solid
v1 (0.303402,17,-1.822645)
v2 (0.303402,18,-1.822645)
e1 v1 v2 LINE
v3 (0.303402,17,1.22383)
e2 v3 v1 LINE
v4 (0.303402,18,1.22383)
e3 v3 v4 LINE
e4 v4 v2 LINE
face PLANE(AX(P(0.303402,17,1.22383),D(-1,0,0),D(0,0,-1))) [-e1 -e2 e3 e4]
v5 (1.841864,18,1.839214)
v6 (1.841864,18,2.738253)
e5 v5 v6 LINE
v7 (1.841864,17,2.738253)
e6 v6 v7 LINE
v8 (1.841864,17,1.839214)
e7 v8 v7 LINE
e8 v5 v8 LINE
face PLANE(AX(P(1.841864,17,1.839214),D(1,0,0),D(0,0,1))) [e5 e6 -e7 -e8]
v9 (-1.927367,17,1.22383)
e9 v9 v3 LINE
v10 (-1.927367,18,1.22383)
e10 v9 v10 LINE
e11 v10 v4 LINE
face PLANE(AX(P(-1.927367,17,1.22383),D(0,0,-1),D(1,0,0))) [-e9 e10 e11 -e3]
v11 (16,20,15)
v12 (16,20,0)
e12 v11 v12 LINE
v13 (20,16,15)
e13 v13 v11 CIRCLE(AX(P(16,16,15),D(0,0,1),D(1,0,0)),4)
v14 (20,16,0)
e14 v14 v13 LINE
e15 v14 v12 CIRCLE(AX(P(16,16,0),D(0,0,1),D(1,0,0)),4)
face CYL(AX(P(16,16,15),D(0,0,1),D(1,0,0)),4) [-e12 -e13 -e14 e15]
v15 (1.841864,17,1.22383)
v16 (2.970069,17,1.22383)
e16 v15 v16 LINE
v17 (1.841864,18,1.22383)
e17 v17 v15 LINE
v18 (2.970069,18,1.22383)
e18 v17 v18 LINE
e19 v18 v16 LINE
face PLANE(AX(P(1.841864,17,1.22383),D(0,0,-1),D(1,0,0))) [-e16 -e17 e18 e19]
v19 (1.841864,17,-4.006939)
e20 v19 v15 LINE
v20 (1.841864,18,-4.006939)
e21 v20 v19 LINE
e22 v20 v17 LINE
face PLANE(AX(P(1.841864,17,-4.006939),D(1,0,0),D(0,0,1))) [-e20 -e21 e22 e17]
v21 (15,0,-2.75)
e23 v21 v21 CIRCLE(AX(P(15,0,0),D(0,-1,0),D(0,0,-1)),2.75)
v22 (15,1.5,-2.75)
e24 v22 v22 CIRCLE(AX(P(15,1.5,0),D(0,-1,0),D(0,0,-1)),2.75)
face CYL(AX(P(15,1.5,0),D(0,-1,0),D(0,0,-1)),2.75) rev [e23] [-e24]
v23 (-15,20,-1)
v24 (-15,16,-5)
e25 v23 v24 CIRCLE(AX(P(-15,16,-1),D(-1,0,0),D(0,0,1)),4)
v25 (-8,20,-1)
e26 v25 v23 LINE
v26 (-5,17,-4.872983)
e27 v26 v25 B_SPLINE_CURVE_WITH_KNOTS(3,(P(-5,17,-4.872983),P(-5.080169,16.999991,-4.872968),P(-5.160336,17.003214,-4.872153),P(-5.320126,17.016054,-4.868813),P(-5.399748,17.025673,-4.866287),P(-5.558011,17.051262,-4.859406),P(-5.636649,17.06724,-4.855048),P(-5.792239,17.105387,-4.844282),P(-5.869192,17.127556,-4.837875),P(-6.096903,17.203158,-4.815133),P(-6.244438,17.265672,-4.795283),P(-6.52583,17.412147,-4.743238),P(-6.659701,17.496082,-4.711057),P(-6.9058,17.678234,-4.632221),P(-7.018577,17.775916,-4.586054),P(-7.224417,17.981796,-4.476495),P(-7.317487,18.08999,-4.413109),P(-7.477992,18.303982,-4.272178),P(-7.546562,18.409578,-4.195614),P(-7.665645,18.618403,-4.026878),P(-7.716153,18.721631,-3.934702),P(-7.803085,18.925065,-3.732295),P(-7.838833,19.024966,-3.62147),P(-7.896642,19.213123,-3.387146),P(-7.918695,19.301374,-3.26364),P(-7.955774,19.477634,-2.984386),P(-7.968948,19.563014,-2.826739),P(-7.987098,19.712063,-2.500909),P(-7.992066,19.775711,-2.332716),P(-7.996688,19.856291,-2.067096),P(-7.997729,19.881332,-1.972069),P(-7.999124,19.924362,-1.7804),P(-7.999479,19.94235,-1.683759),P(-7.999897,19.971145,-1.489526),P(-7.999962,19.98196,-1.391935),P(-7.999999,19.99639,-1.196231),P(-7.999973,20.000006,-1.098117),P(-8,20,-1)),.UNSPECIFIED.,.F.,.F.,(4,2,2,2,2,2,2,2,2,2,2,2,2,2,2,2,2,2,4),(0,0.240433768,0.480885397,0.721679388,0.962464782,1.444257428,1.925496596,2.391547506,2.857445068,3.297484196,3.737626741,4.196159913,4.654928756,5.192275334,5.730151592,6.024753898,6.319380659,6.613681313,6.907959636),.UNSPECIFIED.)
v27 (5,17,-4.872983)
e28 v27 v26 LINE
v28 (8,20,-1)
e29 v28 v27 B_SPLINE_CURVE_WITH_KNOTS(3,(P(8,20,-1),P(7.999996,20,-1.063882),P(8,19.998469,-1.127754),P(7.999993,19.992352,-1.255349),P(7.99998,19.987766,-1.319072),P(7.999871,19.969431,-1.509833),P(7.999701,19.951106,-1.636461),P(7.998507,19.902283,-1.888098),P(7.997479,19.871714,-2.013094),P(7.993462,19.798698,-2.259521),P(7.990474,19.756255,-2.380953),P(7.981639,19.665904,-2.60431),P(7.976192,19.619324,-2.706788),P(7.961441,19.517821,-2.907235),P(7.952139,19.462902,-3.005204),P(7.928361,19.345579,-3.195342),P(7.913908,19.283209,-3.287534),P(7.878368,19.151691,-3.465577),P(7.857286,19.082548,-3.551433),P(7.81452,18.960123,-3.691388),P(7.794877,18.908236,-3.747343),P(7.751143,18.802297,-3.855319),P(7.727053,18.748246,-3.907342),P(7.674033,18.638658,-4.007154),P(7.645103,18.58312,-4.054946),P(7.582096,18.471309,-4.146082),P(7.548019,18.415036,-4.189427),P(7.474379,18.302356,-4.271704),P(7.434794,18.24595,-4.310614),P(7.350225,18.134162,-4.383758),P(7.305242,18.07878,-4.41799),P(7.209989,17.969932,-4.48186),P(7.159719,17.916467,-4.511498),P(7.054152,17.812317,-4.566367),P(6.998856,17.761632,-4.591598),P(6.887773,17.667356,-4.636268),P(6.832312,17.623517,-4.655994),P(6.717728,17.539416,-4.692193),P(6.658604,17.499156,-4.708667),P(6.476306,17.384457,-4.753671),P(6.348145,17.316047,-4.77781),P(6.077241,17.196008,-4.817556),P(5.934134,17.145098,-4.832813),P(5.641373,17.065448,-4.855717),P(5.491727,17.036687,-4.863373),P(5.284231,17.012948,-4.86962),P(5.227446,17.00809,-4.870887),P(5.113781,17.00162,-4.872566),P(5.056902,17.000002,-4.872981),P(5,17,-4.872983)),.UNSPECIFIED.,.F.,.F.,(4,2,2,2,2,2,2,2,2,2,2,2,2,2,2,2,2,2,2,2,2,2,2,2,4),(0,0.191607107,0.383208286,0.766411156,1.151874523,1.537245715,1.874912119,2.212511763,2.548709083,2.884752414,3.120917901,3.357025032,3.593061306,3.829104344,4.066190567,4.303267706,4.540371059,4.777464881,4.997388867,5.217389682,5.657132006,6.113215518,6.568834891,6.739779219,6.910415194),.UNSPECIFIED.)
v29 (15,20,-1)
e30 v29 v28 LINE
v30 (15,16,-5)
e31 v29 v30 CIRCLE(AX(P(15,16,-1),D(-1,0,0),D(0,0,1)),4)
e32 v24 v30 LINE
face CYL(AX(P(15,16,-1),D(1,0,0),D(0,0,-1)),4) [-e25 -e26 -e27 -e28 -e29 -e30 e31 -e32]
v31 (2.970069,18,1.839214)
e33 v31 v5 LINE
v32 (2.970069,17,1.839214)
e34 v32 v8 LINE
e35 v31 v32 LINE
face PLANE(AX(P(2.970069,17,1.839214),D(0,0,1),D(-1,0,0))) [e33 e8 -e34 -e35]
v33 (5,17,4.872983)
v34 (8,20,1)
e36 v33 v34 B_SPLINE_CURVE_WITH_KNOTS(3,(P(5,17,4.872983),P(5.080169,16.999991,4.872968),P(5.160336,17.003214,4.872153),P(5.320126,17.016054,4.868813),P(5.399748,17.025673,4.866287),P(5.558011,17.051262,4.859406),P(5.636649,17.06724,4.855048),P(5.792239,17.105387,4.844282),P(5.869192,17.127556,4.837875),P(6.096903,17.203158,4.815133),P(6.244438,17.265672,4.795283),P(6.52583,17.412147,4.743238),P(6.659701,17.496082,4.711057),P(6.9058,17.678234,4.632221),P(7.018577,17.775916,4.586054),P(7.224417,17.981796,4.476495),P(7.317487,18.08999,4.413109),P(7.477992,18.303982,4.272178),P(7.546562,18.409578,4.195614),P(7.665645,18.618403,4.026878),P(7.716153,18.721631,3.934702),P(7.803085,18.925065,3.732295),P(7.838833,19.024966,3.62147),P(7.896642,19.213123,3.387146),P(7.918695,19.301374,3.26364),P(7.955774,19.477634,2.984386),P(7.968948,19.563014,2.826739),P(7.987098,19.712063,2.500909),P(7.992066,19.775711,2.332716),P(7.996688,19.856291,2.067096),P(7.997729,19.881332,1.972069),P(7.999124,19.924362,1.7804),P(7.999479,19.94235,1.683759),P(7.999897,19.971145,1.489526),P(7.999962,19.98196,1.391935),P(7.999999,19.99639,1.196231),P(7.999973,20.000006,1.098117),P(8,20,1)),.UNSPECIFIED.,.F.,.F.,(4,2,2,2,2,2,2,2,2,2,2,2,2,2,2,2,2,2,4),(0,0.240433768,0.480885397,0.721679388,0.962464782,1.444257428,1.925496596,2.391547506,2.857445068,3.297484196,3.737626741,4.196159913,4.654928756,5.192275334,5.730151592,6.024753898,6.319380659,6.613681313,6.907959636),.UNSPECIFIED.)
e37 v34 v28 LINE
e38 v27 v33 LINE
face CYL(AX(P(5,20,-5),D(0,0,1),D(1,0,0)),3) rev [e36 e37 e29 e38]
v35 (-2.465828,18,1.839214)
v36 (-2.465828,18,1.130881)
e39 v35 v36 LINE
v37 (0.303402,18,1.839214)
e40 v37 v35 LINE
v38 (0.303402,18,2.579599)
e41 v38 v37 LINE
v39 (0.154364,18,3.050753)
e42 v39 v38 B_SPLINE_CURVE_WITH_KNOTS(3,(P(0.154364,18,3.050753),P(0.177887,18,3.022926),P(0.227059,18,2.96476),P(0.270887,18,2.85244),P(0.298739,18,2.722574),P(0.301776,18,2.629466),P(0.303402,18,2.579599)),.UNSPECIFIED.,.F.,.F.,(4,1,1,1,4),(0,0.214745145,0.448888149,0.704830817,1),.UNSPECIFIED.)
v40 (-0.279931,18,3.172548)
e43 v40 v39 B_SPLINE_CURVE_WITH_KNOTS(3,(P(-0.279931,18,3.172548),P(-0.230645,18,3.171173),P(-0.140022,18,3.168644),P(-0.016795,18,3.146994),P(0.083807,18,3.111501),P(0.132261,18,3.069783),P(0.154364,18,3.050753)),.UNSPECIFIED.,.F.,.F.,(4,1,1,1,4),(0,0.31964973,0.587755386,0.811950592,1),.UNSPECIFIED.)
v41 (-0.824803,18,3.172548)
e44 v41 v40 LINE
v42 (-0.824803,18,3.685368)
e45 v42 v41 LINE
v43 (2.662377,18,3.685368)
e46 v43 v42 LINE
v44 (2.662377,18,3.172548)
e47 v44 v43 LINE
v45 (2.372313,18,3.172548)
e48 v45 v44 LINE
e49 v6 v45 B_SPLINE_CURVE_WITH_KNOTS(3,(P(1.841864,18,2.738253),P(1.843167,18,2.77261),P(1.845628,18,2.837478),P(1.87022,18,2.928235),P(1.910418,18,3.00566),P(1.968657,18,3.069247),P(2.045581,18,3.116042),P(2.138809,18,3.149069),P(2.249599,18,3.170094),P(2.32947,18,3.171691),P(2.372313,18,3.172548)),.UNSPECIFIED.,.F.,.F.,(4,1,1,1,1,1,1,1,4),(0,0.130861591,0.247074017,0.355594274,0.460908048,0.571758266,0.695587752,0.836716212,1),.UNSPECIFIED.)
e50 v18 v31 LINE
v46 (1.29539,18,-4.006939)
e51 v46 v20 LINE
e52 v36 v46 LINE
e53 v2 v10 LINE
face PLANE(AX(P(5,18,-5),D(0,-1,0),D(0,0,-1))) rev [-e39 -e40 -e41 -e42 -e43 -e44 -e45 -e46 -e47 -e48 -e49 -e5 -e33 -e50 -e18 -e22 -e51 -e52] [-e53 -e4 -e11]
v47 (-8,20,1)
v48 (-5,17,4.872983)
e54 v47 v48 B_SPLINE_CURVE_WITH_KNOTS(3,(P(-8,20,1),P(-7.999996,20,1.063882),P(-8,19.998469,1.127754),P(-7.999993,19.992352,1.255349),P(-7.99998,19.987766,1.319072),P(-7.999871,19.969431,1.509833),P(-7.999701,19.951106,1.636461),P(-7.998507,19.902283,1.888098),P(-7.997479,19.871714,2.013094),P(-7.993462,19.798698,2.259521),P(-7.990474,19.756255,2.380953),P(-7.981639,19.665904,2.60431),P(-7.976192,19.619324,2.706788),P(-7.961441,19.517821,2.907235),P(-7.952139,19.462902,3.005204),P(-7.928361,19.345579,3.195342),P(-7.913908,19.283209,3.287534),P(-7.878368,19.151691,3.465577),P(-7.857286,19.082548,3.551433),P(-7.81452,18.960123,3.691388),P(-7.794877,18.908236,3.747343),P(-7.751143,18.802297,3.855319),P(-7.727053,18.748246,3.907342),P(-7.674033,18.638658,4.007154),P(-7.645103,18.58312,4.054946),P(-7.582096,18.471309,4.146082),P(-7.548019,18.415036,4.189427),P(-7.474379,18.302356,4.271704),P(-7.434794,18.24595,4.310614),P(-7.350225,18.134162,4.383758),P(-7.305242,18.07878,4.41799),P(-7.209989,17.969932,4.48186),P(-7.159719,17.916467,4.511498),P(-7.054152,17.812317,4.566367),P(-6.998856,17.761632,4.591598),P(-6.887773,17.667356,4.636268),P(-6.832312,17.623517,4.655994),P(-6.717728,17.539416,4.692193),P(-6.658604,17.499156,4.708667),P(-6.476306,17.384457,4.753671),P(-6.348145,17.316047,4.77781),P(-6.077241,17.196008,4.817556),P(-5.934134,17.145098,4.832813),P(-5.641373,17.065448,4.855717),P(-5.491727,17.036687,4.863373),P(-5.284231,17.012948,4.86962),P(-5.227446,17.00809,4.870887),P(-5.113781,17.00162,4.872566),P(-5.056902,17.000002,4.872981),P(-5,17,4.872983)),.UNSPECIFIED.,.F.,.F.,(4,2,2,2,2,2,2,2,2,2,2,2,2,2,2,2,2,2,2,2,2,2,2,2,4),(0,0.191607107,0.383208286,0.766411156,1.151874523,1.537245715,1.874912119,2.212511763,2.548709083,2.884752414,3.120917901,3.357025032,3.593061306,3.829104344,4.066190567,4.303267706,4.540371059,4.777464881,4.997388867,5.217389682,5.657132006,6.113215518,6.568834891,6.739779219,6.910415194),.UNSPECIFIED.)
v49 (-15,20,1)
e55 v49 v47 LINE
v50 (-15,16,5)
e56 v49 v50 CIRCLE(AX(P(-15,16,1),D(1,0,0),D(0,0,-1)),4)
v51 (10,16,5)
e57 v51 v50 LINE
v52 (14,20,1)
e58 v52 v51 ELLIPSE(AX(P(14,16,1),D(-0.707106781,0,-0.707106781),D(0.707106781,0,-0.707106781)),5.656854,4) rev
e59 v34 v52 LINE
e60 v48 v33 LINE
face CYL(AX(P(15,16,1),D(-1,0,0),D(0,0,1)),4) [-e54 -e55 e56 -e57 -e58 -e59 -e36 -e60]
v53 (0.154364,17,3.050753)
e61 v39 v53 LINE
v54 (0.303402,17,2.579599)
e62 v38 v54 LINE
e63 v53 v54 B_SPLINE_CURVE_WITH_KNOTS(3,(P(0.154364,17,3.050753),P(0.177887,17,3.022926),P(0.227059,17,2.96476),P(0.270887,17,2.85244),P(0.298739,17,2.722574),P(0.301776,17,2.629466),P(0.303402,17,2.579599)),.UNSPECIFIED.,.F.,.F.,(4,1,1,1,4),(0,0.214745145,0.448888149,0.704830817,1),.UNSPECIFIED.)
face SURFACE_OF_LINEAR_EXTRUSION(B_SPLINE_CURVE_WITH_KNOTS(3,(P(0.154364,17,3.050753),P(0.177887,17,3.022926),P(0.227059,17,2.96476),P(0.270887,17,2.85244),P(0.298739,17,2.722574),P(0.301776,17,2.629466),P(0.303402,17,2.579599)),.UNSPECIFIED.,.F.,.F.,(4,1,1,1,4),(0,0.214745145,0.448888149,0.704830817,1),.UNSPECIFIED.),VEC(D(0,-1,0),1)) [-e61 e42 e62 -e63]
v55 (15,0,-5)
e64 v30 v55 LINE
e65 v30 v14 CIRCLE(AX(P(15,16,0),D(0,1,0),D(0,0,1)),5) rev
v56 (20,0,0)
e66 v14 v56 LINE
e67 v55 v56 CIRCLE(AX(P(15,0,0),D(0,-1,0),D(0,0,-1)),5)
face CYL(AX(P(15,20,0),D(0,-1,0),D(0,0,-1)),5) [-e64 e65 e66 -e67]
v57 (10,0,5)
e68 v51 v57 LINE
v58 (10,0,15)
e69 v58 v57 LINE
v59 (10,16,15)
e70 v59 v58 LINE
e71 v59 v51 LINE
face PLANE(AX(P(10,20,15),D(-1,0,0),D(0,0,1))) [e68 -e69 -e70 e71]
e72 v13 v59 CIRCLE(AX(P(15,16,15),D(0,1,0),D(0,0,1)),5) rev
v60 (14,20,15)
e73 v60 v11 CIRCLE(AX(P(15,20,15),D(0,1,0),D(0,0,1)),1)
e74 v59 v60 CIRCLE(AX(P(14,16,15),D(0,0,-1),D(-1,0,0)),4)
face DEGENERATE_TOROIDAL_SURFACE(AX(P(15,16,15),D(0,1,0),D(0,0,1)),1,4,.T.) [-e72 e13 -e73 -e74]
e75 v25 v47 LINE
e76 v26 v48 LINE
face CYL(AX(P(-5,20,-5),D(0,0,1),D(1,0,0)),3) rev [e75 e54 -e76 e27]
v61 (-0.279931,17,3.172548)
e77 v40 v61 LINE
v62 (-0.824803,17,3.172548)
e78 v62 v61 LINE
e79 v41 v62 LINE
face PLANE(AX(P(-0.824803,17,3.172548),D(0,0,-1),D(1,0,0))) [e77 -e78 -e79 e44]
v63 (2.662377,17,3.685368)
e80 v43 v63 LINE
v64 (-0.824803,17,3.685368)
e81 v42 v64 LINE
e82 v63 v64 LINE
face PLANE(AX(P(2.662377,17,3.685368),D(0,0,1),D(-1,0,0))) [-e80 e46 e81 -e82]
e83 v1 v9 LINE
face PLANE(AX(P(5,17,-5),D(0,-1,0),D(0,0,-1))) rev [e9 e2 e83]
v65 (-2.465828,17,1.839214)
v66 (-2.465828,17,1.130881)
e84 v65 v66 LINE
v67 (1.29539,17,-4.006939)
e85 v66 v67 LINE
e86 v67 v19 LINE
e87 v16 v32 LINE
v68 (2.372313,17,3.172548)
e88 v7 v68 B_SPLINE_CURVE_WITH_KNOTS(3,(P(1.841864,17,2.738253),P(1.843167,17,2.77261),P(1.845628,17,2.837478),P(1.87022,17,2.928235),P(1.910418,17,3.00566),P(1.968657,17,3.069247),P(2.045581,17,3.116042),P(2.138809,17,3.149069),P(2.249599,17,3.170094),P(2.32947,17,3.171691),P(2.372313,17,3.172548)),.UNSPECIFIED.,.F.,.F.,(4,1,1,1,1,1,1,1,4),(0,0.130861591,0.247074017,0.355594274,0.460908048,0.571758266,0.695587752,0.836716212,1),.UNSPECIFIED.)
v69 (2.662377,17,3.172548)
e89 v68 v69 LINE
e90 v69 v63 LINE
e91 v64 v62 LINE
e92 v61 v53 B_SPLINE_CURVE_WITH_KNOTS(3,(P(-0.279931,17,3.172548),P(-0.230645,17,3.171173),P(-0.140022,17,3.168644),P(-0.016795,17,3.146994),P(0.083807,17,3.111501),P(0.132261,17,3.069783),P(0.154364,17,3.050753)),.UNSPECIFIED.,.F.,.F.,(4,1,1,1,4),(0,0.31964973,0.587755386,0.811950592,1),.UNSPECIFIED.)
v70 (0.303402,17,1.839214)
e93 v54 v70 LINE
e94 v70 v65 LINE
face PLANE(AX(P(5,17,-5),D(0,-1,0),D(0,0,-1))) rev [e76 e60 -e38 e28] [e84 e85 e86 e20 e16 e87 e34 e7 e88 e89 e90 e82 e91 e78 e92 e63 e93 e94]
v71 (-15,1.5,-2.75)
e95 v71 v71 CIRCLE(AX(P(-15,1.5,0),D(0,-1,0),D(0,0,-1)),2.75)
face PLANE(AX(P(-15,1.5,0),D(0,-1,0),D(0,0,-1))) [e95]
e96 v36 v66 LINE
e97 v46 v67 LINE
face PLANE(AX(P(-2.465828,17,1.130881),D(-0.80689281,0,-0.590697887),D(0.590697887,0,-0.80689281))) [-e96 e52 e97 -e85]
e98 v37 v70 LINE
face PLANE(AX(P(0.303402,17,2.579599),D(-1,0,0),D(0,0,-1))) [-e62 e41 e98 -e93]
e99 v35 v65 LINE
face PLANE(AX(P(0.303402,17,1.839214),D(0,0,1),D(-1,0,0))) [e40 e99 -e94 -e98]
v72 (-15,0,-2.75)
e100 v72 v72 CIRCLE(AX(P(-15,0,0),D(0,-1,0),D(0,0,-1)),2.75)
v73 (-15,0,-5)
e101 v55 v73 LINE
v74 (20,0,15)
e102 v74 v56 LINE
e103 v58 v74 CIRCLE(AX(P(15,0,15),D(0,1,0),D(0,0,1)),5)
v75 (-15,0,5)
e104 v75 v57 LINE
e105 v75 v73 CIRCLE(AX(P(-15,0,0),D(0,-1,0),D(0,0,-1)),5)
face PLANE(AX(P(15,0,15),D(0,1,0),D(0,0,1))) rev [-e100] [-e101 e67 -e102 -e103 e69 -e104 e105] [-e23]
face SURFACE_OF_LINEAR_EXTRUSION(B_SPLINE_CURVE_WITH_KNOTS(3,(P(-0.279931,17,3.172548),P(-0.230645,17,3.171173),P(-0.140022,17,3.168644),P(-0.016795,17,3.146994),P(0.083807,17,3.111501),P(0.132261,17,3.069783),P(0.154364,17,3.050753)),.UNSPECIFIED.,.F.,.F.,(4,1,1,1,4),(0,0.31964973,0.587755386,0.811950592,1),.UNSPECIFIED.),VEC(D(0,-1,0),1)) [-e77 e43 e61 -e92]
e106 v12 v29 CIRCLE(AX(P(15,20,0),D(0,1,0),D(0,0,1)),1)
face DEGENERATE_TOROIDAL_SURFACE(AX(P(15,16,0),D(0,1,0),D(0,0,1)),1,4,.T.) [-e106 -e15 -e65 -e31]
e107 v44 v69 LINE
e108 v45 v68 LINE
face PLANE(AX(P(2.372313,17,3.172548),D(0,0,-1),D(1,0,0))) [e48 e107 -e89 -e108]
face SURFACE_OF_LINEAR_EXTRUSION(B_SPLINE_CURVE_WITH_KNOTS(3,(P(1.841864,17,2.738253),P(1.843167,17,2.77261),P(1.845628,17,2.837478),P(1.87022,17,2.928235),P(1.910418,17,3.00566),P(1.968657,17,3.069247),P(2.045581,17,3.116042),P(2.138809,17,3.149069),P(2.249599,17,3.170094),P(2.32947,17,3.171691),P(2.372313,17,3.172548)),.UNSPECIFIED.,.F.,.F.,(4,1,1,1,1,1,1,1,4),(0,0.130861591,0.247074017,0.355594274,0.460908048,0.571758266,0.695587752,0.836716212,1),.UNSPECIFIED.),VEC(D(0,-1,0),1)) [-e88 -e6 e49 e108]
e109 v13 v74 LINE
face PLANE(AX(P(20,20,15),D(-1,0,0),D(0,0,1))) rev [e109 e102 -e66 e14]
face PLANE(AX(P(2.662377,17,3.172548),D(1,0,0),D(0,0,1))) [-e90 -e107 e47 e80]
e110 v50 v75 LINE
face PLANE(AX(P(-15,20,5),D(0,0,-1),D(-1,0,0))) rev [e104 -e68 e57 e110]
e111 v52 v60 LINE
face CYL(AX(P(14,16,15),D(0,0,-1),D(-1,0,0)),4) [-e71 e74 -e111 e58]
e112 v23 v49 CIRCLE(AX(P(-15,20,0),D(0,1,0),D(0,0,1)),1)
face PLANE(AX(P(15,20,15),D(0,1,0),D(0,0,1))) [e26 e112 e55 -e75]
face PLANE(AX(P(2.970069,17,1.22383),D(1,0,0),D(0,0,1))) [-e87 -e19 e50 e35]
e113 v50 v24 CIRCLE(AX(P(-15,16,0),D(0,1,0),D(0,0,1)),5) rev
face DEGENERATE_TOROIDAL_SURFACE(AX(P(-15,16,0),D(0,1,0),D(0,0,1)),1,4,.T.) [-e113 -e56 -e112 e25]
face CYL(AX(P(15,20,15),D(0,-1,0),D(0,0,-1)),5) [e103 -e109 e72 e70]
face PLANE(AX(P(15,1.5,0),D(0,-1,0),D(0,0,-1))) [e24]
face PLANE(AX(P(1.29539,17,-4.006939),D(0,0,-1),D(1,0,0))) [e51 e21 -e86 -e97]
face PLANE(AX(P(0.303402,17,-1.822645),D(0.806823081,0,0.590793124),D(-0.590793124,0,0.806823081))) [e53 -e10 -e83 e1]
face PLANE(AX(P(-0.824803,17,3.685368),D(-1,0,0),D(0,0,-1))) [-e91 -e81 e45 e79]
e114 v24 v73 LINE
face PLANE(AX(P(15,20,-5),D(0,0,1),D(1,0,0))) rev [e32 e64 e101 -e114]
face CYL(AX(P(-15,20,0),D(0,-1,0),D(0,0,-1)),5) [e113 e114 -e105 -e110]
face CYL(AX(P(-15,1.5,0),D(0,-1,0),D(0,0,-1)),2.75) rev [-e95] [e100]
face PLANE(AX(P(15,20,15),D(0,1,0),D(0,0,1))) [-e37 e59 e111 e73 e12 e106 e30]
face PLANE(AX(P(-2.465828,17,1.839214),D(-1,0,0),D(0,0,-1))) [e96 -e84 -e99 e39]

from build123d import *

# Parameters (mm, degrees)
BOSS_EXTRUDE1_DEPTH     = 20
FILLET1_R               = 4
SKETCH2_R               = 2.75
CUT_EXTRUDE1_DEPTH      = 1.5
LPATTERN1_COUNT         = 2
LPATTERN1_PITCH         = 30
CUT_EXTRUDE2_DEPTH      = 35.641016151
CUT_EXTRUDE2_DEPTH_BACK = 35.641016151
WRAP1_DEPTH             = 1


# Read off the part's stored shape, not the designer's step: Wrap1
with BuildPart() as part:
    # Sketch1 → Boss-Extrude1 (new body)
    with BuildSketch(Plane(origin=(0, 0, 0), x_dir=(1, 0, 0), z_dir=(0, 1, 0))):
        with BuildLine():
            Line((-15, -5), (10, -5))
            Line((10, -5), (10, -15))
            ThreePointArc((10, -15), (15, -20), (20, -15))
            Line((20, -15), (20, 0))
            ThreePointArc((20, 0), (18.535533906, 3.535533906), (15, 5))
            Line((15, 5), (-15, 5))
            ThreePointArc((-15, 5), (-20, 0), (-15, -5))
        make_face()
    extrude(amount=BOSS_EXTRUDE1_DEPTH)

    # Fillet1
    fillet1_edges = [part.edges().sort_by_distance(p)[0] for p in [
        (15, 20, 20),
        (20, 20, 7.5),
        (18.535533906, 20, -3.535533906),
        (0, 20, -5),
        (-20, 20, 0),
        (-2.5, 20, 5),
        (10, 20, 10),
    ]]
    fillet(fillet1_edges, radius=FILLET1_R)

    # Sketch2 → Cut-Extrude1 (cut)
    with BuildSketch(Plane.XZ):
        with Locations(Location((-15, 0, 0), (0, 0, 270))):
            Circle(SKETCH2_R)
    cut_extrude1 = extrude(amount=-CUT_EXTRUDE1_DEPTH, mode=Mode.SUBTRACT)

    # LPattern1: Cut-Extrude1 ×2
    with Locations(*[(i * LPATTERN1_PITCH, 0, 0) for i in range(1, LPATTERN1_COUNT)]):
        add(cut_extrude1, mode=Mode.SUBTRACT)

    # Sketch3 → Cut-Extrude2 (cut, two sides: drawn at the far end of the back side and taken through both)
    with BuildSketch(Plane.XY.offset(-CUT_EXTRUDE2_DEPTH_BACK)):
        with BuildLine():
            Line((5, 17), (-5, 17))
            ThreePointArc((-5, 17), (-8, 20), (-5, 23))
            Line((-5, 23), (5, 23))
            ThreePointArc((5, 23), (8, 20), (5, 17))
        make_face()
    extrude(amount=CUT_EXTRUDE2_DEPTH + CUT_EXTRUDE2_DEPTH_BACK, mode=Mode.SUBTRACT)

    # Wrap1 outline → Wrap1 (add)
    with BuildSketch(Plane(origin=(0, 17, 0), x_dir=(1, 0, 0), z_dir=(0, 1, 0))):
        with BuildLine():
            add(Edge.make_bspline(
                [(1.841863893, -2.738252863), (1.843167117, -2.772610038), (1.845627679, -2.837478309), (1.870220056, -2.928234816), (1.910417773, -3.005660397), (1.968656697, -3.069246584), (2.04558102, -3.11604167), (2.138808991, -3.149069173), (2.249599225, -3.170094309), (2.329470455, -3.171691186), (2.372312611, -3.172547735)],
                knots=[0, 0, 0, 0, 0.130861591, 0.247074017, 0.355594274, 0.460908048, 0.571758266, 0.695587752, 0.836716212, 1, 1, 1, 1], degree=3))
            Line((1.841863893, -2.738252863), (1.841863893, -1.839214402))
            Line((1.841863893, -1.839214402), (2.970069021, -1.839214402))
            Line((2.970069021, -1.839214402), (2.970069021, -1.223829786))
            Line((2.970069021, -1.223829786), (1.841863893, -1.223829786))
            Line((1.841863893, -1.223829786), (1.841863893, 4.006939444))
            Line((1.841863893, 4.006939444), (1.295389534, 4.006939444))
            Line((1.295389534, 4.006939444), (-2.465828415, -1.130881068))
            Line((-2.465828415, -1.130881068), (-2.465828415, -1.839214402))
            Line((-2.465828415, -1.839214402), (0.303402354, -1.839214402))
            Line((0.303402354, -1.839214402), (0.303402354, -2.579599017))
            add(Edge.make_bspline(
                [(0.154363893, -3.050752863), (0.177887379, -3.022926473), (0.227059219, -2.964760144), (0.27088721, -2.852439848), (0.29873926, -2.722573798), (0.301775942, -2.629466316), (0.303402354, -2.579599017)],
                knots=[0, 0, 0, 0, 0.214745145, 0.448888149, 0.704830817, 1, 1, 1, 1], degree=3))
            add(Edge.make_bspline(
                [(-0.279930979, -3.172547735), (-0.230645452, -3.171172689), (-0.140021776, -3.168644324), (-0.016795191, -3.146993527), (0.083806957, -3.111501143), (0.132261074, -3.069783001), (0.154363893, -3.050752863)],
                knots=[0, 0, 0, 0, 0.31964973, 0.587755386, 0.811950592, 1, 1, 1, 1], degree=3))
            Line((-0.279930979, -3.172547735), (-0.824802774, -3.172547735))
            Line((-0.824802774, -3.172547735), (-0.824802774, -3.685368248))
            Line((-0.824802774, -3.685368248), (2.662376713, -3.685368248))
            Line((2.662376713, -3.685368248), (2.662376713, -3.172547735))
            Line((2.662376713, -3.172547735), (2.372312611, -3.172547735))
        make_face()
        Polygon((0.303402354, 1.822644573), (0.303402354, -1.223829786), (-1.927366876, -1.223829786), align=None, mode=Mode.SUBTRACT)
    extrude(amount=WRAP1_DEPTH)


solid = part.part
